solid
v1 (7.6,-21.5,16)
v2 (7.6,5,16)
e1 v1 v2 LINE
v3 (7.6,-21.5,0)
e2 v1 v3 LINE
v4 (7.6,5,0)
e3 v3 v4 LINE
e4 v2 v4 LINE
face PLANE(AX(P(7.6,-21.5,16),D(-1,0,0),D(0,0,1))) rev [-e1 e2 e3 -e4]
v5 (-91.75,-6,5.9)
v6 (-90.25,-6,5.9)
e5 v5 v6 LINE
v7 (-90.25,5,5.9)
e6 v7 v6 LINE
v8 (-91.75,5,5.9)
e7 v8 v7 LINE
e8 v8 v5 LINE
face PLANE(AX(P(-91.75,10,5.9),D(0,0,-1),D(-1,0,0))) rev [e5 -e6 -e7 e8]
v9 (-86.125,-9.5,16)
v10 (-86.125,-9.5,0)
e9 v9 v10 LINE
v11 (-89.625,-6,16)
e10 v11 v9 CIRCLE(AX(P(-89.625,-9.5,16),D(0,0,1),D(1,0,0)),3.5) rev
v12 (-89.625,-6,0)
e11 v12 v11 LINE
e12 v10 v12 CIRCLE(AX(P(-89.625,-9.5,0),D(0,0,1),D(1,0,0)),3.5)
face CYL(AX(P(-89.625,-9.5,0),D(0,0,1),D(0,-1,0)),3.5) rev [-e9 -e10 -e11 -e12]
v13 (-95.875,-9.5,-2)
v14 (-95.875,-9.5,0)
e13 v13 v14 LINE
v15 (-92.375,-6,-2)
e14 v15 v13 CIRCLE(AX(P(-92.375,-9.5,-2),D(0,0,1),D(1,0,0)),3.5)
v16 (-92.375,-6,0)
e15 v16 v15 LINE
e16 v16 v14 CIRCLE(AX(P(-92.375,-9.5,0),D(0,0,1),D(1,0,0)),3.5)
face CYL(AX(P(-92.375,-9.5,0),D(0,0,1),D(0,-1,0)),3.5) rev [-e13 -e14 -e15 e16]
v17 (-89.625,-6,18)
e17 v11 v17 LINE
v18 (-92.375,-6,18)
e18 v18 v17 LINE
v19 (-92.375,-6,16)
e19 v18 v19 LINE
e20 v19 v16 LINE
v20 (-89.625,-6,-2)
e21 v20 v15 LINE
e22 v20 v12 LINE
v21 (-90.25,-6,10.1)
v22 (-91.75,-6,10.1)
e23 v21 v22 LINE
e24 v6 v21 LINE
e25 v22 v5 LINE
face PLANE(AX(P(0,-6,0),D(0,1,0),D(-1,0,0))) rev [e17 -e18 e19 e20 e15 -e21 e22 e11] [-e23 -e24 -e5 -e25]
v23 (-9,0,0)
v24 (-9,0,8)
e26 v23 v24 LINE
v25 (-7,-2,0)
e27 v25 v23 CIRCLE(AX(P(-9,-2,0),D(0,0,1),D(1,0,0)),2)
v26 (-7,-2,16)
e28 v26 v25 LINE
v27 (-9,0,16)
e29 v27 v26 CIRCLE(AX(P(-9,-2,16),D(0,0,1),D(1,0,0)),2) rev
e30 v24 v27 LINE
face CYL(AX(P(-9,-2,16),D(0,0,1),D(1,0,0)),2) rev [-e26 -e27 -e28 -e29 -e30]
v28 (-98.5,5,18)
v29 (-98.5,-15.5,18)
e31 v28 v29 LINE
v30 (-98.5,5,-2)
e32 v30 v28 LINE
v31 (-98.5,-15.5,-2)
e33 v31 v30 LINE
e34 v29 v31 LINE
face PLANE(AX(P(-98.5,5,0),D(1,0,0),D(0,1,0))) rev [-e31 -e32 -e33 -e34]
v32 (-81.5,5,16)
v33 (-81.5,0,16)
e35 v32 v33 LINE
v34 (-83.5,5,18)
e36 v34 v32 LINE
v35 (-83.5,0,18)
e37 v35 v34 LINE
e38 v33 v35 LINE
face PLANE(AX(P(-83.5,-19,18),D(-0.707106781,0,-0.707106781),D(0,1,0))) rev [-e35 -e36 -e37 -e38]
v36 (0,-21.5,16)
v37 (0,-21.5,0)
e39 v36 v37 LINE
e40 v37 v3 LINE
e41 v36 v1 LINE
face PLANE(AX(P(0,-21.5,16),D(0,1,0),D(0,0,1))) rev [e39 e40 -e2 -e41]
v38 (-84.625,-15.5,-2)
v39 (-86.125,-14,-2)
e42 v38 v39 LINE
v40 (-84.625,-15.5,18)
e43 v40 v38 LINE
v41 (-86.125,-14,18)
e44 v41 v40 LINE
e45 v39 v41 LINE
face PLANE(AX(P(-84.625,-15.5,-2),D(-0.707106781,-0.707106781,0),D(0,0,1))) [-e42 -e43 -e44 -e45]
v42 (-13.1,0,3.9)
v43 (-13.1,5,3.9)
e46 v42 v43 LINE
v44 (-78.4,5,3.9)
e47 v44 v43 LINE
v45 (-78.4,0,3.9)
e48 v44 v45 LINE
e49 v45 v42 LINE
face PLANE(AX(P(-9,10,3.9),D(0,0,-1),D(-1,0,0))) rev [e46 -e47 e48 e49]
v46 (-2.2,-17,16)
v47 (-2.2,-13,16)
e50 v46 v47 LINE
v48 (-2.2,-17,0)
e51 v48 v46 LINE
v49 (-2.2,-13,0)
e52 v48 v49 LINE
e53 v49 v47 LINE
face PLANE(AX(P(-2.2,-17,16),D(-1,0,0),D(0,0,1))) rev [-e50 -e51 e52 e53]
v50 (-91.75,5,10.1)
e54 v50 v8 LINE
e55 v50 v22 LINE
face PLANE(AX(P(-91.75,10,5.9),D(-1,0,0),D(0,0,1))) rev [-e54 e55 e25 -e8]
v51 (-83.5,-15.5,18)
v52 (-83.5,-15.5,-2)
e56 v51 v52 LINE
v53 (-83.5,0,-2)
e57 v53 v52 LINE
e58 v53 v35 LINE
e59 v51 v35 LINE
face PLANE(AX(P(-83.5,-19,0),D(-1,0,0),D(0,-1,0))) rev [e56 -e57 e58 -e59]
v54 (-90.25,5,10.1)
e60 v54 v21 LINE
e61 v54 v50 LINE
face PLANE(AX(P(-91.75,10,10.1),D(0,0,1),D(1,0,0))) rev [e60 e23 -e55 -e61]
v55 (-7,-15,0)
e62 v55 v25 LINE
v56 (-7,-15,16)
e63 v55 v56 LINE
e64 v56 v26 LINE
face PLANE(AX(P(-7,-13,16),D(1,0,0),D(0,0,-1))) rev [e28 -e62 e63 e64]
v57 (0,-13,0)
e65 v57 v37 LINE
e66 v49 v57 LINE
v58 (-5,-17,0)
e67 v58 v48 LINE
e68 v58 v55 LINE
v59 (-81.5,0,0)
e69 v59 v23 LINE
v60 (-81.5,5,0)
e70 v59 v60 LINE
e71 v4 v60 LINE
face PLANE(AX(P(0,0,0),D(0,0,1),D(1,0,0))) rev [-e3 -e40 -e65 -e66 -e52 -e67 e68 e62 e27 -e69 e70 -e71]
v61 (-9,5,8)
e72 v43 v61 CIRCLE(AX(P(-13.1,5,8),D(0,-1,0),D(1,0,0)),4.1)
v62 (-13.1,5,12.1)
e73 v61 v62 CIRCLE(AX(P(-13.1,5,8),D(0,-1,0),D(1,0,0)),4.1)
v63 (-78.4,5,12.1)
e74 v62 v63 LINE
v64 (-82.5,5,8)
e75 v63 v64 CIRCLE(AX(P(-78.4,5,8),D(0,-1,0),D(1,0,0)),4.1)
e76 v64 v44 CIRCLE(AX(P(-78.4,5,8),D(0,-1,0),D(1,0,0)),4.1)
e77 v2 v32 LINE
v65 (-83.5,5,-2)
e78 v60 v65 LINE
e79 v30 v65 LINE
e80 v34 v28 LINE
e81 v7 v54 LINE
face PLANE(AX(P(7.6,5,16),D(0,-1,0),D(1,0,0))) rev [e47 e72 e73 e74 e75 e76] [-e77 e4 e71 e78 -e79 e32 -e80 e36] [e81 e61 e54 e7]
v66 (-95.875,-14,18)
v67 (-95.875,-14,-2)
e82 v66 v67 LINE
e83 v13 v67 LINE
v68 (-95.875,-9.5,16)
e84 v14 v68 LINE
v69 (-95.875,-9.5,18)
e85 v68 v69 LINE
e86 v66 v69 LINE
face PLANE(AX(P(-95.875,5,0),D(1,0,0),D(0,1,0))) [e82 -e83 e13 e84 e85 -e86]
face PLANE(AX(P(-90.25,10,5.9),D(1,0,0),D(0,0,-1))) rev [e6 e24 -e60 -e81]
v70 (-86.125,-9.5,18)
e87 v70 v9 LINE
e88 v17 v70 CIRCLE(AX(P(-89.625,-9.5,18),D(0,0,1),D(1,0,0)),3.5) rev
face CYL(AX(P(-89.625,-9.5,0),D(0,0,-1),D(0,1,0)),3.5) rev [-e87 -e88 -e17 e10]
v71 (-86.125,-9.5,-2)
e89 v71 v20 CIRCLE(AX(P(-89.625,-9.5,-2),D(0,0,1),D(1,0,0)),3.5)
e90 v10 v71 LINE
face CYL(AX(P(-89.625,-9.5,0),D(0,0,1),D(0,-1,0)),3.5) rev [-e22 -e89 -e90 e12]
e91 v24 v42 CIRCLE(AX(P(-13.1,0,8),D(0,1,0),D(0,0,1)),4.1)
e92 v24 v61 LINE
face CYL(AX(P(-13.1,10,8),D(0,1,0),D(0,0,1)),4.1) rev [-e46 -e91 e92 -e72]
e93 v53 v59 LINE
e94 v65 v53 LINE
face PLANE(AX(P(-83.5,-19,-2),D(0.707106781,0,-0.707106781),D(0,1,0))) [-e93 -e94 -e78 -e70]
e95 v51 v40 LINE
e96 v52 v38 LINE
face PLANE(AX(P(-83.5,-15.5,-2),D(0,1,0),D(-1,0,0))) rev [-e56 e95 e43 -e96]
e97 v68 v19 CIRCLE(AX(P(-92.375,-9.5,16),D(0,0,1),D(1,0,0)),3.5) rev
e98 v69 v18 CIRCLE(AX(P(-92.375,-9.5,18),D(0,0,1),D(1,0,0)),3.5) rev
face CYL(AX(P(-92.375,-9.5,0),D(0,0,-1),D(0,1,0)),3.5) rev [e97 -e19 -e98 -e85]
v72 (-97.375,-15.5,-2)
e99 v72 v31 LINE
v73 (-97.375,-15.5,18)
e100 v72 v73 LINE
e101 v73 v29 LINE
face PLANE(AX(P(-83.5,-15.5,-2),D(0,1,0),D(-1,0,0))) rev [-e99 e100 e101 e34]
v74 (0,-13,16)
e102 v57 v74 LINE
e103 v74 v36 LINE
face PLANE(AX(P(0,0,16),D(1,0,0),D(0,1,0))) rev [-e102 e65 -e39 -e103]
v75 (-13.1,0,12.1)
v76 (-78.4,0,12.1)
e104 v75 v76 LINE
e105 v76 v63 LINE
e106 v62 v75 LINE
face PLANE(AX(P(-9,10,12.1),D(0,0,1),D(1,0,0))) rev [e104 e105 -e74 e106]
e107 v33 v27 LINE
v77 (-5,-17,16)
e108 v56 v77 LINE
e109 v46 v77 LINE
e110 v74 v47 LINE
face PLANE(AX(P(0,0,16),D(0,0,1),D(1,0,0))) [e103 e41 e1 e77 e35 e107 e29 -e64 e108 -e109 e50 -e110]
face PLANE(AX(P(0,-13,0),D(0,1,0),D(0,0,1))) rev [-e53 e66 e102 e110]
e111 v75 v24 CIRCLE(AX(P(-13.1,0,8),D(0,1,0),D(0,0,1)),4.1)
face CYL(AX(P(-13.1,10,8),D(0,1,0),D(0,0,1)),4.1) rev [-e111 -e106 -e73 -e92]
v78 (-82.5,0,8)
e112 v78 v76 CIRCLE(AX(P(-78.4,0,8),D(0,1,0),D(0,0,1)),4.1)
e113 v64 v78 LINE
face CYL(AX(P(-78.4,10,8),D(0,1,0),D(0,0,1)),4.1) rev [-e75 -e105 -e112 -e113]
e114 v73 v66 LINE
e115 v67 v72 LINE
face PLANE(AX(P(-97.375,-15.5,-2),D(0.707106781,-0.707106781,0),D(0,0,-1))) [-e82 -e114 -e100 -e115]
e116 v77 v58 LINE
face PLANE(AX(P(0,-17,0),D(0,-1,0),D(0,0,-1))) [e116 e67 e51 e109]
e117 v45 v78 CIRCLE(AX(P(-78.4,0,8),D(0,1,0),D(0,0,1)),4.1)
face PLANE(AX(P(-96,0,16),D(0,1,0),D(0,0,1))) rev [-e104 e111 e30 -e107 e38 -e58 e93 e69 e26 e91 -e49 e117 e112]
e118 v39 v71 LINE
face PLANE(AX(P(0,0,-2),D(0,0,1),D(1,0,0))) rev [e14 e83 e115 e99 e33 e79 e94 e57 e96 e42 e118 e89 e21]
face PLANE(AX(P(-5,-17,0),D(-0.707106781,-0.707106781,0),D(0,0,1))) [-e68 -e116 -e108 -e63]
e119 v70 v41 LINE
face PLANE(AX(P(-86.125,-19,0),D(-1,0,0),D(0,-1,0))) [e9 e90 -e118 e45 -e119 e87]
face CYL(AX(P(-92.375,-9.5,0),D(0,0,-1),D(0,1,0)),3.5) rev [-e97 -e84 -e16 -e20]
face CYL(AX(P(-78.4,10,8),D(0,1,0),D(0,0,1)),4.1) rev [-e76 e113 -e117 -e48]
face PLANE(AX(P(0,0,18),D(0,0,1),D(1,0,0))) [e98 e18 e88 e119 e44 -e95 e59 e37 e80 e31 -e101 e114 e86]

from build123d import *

# Parameters (mm, degrees)
EXTRUDE_1_DEPTH      = 16
SKETCH_4_W           = 1.5
SKETCH_4_H           = 4.2
SKETCH_4_W_2         = 73.5
SKETCH_4_H_2         = 8.2
CUT_EXTRUDE_1_DEPTH  = 10
FILLET_1_R           = 4.1
SKETCH_6_W           = 10
SKETCH_6_H           = 16
SKETCH_6_W_2         = 1.5
SKETCH_6_H_2         = 4.2
EXTRUDE_4_DEPTH      = 11
EXTRUDE_6_DEPTH      = 13
EXTRUDE_6_DEPTH_BACK = 11
SKETCH_10_W          = 0.125
SKETCH_10_H          = 16
SKETCH_10_W_2        = 2.5
FILLET_2_R           = 3.5
EXTRUDE_7_DEPTH      = 2
EXTRUDE_8_DEPTH      = 2
FILLET_4_R           = 3.5
CUT_EXTRUDE_START    = -15
SKETCH_13_W          = 20
SKETCH_13_H          = 3.5
CUT_EXTRUDE_2_DEPTH  = 15
CHAMFER_1_SIZE       = 2
CHAMFER_2_SIZE       = 1.5
SKETCH_14_W          = 7
SKETCH_14_H          = 16
EXTRUDE_9_DEPTH      = 13
SKETCH_15_W          = 4.8
SKETCH_15_H          = 16
EXTRUDE_10_DEPTH     = 4
FILLET_5_R           = 2
CHAMFER_3_SIZE       = 2


with BuildPart() as part:
    # 스케치1 → 보스-돌출1 (new body)
    with BuildSketch(Plane.XY):
        Polygon((-96, 0), (0, 0), (0, -21.5), (7.6, -21.5), (7.6, 5), (-96, 5), align=None)
    extrude(amount=EXTRUDE_1_DEPTH)

    # 스케치4 → 컷-돌출1 (cut)
    with BuildSketch(Plane.XZ):
        with Locations((-91, 8)):
            Rectangle(SKETCH_4_W, SKETCH_4_H)
        with Locations((-45.75, 8)):
            Rectangle(SKETCH_4_W_2, SKETCH_4_H_2)
    extrude(amount=-CUT_EXTRUDE_1_DEPTH, mode=Mode.SUBTRACT)

    # 필렛1
    fillet_1_edges = [part.edges().sort_by_distance(p)[0] for p in [
        (-82.5, 2.5, 3.9),
        (-82.5, 2.5, 12.1),
        (-9, 2.5, 3.9),
        (-9, 2.5, 12.1),
    ]]
    fillet(fillet_1_edges, radius=FILLET_1_R - 0.0001)  # a hair under: the kernel refuses the full size

    # 스케치6 → 보스-돌출4 (add)
    with BuildSketch(Plane(origin=(0, 5, 0), x_dir=(1, 0, 0), z_dir=(0, 1, 0))):
        with Locations((-91, -8)):
            Rectangle(SKETCH_6_W, SKETCH_6_H)
        with Locations((-91, -8)):
            Rectangle(SKETCH_6_W_2, SKETCH_6_H_2, mode=Mode.SUBTRACT)
    extrude(amount=-EXTRUDE_4_DEPTH)

    # 스케치10 → 보스-돌출6 (add, two sides: drawn at the far end of the back side and taken through both)
    with BuildSketch(Plane.XZ.offset(6).offset(-EXTRUDE_6_DEPTH_BACK)):
        with Locations((-95.9375, 8)):
            Rectangle(SKETCH_10_W, SKETCH_10_H)
        with Locations((-97.25, 8)):
            Rectangle(SKETCH_10_W_2, SKETCH_10_H)
        with Locations((-86.0625, 8)):
            Rectangle(SKETCH_10_W, SKETCH_10_H)
        with Locations((-84.75, 8)):
            Rectangle(SKETCH_10_W_2, SKETCH_10_H)
    extrude(amount=EXTRUDE_6_DEPTH + EXTRUDE_6_DEPTH_BACK)

    # 필렛2
    fillet_2_edges = [part.edges().sort_by_distance(p)[0] for p in [
        (-95.875, -6, 8),
        (-86.125, -6, 8),
    ]]
    fillet(fillet_2_edges, radius=FILLET_2_R)

    # 스케치11 → 보스-돌출7 (add)
    with BuildSketch(Plane.XY.offset(16)):
        Polygon((-98.5, 5), (-98.5, -19), (-95.875, -19), (-95.875, -6), (-86.125, -6), (-86.125, -19), (-83.5, -19), (-83.5, 5), align=None)
    extrude(amount=EXTRUDE_7_DEPTH)

    # 스케치12 → 보스-돌출8 (add)
    with BuildSketch(Plane(origin=(0, 0, 0), x_dir=(-1, 0, 0), z_dir=(0, 0, -1))):
        Polygon((83.5, 5), (83.5, -19), (86.125, -19), (86.125, -6), (95.875, -6), (95.875, -19), (98.5, -19), (98.5, 5), align=None)
    extrude(amount=EXTRUDE_8_DEPTH)

    # 필렛4
    fillet_4_edges = [part.edges().sort_by_distance(p)[0] for p in [
        (-95.875, -6, -1),
        (-86.125, -6, -1),
        (-86.125, -6, 17),
        (-95.875, -6, 17),
    ]]
    fillet(fillet_4_edges, radius=FILLET_4_R)

    # 스케치13 → 컷-돌출2 (cut)
    with BuildSketch(Plane.ZY.offset(98.5).offset(CUT_EXTRUDE_START)):
        with Locations((8, -17.25)):
            Rectangle(SKETCH_13_W, SKETCH_13_H)
    extrude(amount=CUT_EXTRUDE_2_DEPTH, mode=Mode.SUBTRACT)

    # 모따기1
    chamfer_1_edges = [part.edges().sort_by_distance(p)[0] for p in [
        (-83.5, 2.5, 0),
        (-83.5, 2.5, 16),
    ]]
    chamfer(chamfer_1_edges, length=CHAMFER_1_SIZE - 0.0001)  # a hair under: the kernel refuses the full size

    # 모따기2
    chamfer_2_edges = [part.edges().sort_by_distance(p)[0] for p in [
        (-95.875, -15.5, 8),
        (-86.125, -15.5, 8),
    ]]
    chamfer(chamfer_2_edges, length=CHAMFER_2_SIZE)

    # 스케치14 → 보스-돌출9 (add)
    with BuildSketch(Plane.XZ):
        with Locations((-3.5, 8)):
            Rectangle(SKETCH_14_W, SKETCH_14_H)
    extrude(amount=EXTRUDE_9_DEPTH)

    # 스케치15 → 보스-돌출10 (add)
    with BuildSketch(Plane.XZ.offset(13)):
        with Locations((-4.6, 8)):
            Rectangle(SKETCH_15_W, SKETCH_15_H)
    extrude(amount=EXTRUDE_10_DEPTH)

    # 필렛5
    fillet_5_edges = [part.edges().sort_by_distance(p)[0] for p in [
        (-7, 0, 8),
    ]]
    fillet(fillet_5_edges, radius=FILLET_5_R - 0.0001)  # a hair under: the kernel refuses the full size

    # 모따기3
    chamfer_3_edges = [part.edges().sort_by_distance(p)[0] for p in [
        (-7, -17, 8),
    ]]
    chamfer(chamfer_3_edges, length=CHAMFER_3_SIZE)


solid = part.part
